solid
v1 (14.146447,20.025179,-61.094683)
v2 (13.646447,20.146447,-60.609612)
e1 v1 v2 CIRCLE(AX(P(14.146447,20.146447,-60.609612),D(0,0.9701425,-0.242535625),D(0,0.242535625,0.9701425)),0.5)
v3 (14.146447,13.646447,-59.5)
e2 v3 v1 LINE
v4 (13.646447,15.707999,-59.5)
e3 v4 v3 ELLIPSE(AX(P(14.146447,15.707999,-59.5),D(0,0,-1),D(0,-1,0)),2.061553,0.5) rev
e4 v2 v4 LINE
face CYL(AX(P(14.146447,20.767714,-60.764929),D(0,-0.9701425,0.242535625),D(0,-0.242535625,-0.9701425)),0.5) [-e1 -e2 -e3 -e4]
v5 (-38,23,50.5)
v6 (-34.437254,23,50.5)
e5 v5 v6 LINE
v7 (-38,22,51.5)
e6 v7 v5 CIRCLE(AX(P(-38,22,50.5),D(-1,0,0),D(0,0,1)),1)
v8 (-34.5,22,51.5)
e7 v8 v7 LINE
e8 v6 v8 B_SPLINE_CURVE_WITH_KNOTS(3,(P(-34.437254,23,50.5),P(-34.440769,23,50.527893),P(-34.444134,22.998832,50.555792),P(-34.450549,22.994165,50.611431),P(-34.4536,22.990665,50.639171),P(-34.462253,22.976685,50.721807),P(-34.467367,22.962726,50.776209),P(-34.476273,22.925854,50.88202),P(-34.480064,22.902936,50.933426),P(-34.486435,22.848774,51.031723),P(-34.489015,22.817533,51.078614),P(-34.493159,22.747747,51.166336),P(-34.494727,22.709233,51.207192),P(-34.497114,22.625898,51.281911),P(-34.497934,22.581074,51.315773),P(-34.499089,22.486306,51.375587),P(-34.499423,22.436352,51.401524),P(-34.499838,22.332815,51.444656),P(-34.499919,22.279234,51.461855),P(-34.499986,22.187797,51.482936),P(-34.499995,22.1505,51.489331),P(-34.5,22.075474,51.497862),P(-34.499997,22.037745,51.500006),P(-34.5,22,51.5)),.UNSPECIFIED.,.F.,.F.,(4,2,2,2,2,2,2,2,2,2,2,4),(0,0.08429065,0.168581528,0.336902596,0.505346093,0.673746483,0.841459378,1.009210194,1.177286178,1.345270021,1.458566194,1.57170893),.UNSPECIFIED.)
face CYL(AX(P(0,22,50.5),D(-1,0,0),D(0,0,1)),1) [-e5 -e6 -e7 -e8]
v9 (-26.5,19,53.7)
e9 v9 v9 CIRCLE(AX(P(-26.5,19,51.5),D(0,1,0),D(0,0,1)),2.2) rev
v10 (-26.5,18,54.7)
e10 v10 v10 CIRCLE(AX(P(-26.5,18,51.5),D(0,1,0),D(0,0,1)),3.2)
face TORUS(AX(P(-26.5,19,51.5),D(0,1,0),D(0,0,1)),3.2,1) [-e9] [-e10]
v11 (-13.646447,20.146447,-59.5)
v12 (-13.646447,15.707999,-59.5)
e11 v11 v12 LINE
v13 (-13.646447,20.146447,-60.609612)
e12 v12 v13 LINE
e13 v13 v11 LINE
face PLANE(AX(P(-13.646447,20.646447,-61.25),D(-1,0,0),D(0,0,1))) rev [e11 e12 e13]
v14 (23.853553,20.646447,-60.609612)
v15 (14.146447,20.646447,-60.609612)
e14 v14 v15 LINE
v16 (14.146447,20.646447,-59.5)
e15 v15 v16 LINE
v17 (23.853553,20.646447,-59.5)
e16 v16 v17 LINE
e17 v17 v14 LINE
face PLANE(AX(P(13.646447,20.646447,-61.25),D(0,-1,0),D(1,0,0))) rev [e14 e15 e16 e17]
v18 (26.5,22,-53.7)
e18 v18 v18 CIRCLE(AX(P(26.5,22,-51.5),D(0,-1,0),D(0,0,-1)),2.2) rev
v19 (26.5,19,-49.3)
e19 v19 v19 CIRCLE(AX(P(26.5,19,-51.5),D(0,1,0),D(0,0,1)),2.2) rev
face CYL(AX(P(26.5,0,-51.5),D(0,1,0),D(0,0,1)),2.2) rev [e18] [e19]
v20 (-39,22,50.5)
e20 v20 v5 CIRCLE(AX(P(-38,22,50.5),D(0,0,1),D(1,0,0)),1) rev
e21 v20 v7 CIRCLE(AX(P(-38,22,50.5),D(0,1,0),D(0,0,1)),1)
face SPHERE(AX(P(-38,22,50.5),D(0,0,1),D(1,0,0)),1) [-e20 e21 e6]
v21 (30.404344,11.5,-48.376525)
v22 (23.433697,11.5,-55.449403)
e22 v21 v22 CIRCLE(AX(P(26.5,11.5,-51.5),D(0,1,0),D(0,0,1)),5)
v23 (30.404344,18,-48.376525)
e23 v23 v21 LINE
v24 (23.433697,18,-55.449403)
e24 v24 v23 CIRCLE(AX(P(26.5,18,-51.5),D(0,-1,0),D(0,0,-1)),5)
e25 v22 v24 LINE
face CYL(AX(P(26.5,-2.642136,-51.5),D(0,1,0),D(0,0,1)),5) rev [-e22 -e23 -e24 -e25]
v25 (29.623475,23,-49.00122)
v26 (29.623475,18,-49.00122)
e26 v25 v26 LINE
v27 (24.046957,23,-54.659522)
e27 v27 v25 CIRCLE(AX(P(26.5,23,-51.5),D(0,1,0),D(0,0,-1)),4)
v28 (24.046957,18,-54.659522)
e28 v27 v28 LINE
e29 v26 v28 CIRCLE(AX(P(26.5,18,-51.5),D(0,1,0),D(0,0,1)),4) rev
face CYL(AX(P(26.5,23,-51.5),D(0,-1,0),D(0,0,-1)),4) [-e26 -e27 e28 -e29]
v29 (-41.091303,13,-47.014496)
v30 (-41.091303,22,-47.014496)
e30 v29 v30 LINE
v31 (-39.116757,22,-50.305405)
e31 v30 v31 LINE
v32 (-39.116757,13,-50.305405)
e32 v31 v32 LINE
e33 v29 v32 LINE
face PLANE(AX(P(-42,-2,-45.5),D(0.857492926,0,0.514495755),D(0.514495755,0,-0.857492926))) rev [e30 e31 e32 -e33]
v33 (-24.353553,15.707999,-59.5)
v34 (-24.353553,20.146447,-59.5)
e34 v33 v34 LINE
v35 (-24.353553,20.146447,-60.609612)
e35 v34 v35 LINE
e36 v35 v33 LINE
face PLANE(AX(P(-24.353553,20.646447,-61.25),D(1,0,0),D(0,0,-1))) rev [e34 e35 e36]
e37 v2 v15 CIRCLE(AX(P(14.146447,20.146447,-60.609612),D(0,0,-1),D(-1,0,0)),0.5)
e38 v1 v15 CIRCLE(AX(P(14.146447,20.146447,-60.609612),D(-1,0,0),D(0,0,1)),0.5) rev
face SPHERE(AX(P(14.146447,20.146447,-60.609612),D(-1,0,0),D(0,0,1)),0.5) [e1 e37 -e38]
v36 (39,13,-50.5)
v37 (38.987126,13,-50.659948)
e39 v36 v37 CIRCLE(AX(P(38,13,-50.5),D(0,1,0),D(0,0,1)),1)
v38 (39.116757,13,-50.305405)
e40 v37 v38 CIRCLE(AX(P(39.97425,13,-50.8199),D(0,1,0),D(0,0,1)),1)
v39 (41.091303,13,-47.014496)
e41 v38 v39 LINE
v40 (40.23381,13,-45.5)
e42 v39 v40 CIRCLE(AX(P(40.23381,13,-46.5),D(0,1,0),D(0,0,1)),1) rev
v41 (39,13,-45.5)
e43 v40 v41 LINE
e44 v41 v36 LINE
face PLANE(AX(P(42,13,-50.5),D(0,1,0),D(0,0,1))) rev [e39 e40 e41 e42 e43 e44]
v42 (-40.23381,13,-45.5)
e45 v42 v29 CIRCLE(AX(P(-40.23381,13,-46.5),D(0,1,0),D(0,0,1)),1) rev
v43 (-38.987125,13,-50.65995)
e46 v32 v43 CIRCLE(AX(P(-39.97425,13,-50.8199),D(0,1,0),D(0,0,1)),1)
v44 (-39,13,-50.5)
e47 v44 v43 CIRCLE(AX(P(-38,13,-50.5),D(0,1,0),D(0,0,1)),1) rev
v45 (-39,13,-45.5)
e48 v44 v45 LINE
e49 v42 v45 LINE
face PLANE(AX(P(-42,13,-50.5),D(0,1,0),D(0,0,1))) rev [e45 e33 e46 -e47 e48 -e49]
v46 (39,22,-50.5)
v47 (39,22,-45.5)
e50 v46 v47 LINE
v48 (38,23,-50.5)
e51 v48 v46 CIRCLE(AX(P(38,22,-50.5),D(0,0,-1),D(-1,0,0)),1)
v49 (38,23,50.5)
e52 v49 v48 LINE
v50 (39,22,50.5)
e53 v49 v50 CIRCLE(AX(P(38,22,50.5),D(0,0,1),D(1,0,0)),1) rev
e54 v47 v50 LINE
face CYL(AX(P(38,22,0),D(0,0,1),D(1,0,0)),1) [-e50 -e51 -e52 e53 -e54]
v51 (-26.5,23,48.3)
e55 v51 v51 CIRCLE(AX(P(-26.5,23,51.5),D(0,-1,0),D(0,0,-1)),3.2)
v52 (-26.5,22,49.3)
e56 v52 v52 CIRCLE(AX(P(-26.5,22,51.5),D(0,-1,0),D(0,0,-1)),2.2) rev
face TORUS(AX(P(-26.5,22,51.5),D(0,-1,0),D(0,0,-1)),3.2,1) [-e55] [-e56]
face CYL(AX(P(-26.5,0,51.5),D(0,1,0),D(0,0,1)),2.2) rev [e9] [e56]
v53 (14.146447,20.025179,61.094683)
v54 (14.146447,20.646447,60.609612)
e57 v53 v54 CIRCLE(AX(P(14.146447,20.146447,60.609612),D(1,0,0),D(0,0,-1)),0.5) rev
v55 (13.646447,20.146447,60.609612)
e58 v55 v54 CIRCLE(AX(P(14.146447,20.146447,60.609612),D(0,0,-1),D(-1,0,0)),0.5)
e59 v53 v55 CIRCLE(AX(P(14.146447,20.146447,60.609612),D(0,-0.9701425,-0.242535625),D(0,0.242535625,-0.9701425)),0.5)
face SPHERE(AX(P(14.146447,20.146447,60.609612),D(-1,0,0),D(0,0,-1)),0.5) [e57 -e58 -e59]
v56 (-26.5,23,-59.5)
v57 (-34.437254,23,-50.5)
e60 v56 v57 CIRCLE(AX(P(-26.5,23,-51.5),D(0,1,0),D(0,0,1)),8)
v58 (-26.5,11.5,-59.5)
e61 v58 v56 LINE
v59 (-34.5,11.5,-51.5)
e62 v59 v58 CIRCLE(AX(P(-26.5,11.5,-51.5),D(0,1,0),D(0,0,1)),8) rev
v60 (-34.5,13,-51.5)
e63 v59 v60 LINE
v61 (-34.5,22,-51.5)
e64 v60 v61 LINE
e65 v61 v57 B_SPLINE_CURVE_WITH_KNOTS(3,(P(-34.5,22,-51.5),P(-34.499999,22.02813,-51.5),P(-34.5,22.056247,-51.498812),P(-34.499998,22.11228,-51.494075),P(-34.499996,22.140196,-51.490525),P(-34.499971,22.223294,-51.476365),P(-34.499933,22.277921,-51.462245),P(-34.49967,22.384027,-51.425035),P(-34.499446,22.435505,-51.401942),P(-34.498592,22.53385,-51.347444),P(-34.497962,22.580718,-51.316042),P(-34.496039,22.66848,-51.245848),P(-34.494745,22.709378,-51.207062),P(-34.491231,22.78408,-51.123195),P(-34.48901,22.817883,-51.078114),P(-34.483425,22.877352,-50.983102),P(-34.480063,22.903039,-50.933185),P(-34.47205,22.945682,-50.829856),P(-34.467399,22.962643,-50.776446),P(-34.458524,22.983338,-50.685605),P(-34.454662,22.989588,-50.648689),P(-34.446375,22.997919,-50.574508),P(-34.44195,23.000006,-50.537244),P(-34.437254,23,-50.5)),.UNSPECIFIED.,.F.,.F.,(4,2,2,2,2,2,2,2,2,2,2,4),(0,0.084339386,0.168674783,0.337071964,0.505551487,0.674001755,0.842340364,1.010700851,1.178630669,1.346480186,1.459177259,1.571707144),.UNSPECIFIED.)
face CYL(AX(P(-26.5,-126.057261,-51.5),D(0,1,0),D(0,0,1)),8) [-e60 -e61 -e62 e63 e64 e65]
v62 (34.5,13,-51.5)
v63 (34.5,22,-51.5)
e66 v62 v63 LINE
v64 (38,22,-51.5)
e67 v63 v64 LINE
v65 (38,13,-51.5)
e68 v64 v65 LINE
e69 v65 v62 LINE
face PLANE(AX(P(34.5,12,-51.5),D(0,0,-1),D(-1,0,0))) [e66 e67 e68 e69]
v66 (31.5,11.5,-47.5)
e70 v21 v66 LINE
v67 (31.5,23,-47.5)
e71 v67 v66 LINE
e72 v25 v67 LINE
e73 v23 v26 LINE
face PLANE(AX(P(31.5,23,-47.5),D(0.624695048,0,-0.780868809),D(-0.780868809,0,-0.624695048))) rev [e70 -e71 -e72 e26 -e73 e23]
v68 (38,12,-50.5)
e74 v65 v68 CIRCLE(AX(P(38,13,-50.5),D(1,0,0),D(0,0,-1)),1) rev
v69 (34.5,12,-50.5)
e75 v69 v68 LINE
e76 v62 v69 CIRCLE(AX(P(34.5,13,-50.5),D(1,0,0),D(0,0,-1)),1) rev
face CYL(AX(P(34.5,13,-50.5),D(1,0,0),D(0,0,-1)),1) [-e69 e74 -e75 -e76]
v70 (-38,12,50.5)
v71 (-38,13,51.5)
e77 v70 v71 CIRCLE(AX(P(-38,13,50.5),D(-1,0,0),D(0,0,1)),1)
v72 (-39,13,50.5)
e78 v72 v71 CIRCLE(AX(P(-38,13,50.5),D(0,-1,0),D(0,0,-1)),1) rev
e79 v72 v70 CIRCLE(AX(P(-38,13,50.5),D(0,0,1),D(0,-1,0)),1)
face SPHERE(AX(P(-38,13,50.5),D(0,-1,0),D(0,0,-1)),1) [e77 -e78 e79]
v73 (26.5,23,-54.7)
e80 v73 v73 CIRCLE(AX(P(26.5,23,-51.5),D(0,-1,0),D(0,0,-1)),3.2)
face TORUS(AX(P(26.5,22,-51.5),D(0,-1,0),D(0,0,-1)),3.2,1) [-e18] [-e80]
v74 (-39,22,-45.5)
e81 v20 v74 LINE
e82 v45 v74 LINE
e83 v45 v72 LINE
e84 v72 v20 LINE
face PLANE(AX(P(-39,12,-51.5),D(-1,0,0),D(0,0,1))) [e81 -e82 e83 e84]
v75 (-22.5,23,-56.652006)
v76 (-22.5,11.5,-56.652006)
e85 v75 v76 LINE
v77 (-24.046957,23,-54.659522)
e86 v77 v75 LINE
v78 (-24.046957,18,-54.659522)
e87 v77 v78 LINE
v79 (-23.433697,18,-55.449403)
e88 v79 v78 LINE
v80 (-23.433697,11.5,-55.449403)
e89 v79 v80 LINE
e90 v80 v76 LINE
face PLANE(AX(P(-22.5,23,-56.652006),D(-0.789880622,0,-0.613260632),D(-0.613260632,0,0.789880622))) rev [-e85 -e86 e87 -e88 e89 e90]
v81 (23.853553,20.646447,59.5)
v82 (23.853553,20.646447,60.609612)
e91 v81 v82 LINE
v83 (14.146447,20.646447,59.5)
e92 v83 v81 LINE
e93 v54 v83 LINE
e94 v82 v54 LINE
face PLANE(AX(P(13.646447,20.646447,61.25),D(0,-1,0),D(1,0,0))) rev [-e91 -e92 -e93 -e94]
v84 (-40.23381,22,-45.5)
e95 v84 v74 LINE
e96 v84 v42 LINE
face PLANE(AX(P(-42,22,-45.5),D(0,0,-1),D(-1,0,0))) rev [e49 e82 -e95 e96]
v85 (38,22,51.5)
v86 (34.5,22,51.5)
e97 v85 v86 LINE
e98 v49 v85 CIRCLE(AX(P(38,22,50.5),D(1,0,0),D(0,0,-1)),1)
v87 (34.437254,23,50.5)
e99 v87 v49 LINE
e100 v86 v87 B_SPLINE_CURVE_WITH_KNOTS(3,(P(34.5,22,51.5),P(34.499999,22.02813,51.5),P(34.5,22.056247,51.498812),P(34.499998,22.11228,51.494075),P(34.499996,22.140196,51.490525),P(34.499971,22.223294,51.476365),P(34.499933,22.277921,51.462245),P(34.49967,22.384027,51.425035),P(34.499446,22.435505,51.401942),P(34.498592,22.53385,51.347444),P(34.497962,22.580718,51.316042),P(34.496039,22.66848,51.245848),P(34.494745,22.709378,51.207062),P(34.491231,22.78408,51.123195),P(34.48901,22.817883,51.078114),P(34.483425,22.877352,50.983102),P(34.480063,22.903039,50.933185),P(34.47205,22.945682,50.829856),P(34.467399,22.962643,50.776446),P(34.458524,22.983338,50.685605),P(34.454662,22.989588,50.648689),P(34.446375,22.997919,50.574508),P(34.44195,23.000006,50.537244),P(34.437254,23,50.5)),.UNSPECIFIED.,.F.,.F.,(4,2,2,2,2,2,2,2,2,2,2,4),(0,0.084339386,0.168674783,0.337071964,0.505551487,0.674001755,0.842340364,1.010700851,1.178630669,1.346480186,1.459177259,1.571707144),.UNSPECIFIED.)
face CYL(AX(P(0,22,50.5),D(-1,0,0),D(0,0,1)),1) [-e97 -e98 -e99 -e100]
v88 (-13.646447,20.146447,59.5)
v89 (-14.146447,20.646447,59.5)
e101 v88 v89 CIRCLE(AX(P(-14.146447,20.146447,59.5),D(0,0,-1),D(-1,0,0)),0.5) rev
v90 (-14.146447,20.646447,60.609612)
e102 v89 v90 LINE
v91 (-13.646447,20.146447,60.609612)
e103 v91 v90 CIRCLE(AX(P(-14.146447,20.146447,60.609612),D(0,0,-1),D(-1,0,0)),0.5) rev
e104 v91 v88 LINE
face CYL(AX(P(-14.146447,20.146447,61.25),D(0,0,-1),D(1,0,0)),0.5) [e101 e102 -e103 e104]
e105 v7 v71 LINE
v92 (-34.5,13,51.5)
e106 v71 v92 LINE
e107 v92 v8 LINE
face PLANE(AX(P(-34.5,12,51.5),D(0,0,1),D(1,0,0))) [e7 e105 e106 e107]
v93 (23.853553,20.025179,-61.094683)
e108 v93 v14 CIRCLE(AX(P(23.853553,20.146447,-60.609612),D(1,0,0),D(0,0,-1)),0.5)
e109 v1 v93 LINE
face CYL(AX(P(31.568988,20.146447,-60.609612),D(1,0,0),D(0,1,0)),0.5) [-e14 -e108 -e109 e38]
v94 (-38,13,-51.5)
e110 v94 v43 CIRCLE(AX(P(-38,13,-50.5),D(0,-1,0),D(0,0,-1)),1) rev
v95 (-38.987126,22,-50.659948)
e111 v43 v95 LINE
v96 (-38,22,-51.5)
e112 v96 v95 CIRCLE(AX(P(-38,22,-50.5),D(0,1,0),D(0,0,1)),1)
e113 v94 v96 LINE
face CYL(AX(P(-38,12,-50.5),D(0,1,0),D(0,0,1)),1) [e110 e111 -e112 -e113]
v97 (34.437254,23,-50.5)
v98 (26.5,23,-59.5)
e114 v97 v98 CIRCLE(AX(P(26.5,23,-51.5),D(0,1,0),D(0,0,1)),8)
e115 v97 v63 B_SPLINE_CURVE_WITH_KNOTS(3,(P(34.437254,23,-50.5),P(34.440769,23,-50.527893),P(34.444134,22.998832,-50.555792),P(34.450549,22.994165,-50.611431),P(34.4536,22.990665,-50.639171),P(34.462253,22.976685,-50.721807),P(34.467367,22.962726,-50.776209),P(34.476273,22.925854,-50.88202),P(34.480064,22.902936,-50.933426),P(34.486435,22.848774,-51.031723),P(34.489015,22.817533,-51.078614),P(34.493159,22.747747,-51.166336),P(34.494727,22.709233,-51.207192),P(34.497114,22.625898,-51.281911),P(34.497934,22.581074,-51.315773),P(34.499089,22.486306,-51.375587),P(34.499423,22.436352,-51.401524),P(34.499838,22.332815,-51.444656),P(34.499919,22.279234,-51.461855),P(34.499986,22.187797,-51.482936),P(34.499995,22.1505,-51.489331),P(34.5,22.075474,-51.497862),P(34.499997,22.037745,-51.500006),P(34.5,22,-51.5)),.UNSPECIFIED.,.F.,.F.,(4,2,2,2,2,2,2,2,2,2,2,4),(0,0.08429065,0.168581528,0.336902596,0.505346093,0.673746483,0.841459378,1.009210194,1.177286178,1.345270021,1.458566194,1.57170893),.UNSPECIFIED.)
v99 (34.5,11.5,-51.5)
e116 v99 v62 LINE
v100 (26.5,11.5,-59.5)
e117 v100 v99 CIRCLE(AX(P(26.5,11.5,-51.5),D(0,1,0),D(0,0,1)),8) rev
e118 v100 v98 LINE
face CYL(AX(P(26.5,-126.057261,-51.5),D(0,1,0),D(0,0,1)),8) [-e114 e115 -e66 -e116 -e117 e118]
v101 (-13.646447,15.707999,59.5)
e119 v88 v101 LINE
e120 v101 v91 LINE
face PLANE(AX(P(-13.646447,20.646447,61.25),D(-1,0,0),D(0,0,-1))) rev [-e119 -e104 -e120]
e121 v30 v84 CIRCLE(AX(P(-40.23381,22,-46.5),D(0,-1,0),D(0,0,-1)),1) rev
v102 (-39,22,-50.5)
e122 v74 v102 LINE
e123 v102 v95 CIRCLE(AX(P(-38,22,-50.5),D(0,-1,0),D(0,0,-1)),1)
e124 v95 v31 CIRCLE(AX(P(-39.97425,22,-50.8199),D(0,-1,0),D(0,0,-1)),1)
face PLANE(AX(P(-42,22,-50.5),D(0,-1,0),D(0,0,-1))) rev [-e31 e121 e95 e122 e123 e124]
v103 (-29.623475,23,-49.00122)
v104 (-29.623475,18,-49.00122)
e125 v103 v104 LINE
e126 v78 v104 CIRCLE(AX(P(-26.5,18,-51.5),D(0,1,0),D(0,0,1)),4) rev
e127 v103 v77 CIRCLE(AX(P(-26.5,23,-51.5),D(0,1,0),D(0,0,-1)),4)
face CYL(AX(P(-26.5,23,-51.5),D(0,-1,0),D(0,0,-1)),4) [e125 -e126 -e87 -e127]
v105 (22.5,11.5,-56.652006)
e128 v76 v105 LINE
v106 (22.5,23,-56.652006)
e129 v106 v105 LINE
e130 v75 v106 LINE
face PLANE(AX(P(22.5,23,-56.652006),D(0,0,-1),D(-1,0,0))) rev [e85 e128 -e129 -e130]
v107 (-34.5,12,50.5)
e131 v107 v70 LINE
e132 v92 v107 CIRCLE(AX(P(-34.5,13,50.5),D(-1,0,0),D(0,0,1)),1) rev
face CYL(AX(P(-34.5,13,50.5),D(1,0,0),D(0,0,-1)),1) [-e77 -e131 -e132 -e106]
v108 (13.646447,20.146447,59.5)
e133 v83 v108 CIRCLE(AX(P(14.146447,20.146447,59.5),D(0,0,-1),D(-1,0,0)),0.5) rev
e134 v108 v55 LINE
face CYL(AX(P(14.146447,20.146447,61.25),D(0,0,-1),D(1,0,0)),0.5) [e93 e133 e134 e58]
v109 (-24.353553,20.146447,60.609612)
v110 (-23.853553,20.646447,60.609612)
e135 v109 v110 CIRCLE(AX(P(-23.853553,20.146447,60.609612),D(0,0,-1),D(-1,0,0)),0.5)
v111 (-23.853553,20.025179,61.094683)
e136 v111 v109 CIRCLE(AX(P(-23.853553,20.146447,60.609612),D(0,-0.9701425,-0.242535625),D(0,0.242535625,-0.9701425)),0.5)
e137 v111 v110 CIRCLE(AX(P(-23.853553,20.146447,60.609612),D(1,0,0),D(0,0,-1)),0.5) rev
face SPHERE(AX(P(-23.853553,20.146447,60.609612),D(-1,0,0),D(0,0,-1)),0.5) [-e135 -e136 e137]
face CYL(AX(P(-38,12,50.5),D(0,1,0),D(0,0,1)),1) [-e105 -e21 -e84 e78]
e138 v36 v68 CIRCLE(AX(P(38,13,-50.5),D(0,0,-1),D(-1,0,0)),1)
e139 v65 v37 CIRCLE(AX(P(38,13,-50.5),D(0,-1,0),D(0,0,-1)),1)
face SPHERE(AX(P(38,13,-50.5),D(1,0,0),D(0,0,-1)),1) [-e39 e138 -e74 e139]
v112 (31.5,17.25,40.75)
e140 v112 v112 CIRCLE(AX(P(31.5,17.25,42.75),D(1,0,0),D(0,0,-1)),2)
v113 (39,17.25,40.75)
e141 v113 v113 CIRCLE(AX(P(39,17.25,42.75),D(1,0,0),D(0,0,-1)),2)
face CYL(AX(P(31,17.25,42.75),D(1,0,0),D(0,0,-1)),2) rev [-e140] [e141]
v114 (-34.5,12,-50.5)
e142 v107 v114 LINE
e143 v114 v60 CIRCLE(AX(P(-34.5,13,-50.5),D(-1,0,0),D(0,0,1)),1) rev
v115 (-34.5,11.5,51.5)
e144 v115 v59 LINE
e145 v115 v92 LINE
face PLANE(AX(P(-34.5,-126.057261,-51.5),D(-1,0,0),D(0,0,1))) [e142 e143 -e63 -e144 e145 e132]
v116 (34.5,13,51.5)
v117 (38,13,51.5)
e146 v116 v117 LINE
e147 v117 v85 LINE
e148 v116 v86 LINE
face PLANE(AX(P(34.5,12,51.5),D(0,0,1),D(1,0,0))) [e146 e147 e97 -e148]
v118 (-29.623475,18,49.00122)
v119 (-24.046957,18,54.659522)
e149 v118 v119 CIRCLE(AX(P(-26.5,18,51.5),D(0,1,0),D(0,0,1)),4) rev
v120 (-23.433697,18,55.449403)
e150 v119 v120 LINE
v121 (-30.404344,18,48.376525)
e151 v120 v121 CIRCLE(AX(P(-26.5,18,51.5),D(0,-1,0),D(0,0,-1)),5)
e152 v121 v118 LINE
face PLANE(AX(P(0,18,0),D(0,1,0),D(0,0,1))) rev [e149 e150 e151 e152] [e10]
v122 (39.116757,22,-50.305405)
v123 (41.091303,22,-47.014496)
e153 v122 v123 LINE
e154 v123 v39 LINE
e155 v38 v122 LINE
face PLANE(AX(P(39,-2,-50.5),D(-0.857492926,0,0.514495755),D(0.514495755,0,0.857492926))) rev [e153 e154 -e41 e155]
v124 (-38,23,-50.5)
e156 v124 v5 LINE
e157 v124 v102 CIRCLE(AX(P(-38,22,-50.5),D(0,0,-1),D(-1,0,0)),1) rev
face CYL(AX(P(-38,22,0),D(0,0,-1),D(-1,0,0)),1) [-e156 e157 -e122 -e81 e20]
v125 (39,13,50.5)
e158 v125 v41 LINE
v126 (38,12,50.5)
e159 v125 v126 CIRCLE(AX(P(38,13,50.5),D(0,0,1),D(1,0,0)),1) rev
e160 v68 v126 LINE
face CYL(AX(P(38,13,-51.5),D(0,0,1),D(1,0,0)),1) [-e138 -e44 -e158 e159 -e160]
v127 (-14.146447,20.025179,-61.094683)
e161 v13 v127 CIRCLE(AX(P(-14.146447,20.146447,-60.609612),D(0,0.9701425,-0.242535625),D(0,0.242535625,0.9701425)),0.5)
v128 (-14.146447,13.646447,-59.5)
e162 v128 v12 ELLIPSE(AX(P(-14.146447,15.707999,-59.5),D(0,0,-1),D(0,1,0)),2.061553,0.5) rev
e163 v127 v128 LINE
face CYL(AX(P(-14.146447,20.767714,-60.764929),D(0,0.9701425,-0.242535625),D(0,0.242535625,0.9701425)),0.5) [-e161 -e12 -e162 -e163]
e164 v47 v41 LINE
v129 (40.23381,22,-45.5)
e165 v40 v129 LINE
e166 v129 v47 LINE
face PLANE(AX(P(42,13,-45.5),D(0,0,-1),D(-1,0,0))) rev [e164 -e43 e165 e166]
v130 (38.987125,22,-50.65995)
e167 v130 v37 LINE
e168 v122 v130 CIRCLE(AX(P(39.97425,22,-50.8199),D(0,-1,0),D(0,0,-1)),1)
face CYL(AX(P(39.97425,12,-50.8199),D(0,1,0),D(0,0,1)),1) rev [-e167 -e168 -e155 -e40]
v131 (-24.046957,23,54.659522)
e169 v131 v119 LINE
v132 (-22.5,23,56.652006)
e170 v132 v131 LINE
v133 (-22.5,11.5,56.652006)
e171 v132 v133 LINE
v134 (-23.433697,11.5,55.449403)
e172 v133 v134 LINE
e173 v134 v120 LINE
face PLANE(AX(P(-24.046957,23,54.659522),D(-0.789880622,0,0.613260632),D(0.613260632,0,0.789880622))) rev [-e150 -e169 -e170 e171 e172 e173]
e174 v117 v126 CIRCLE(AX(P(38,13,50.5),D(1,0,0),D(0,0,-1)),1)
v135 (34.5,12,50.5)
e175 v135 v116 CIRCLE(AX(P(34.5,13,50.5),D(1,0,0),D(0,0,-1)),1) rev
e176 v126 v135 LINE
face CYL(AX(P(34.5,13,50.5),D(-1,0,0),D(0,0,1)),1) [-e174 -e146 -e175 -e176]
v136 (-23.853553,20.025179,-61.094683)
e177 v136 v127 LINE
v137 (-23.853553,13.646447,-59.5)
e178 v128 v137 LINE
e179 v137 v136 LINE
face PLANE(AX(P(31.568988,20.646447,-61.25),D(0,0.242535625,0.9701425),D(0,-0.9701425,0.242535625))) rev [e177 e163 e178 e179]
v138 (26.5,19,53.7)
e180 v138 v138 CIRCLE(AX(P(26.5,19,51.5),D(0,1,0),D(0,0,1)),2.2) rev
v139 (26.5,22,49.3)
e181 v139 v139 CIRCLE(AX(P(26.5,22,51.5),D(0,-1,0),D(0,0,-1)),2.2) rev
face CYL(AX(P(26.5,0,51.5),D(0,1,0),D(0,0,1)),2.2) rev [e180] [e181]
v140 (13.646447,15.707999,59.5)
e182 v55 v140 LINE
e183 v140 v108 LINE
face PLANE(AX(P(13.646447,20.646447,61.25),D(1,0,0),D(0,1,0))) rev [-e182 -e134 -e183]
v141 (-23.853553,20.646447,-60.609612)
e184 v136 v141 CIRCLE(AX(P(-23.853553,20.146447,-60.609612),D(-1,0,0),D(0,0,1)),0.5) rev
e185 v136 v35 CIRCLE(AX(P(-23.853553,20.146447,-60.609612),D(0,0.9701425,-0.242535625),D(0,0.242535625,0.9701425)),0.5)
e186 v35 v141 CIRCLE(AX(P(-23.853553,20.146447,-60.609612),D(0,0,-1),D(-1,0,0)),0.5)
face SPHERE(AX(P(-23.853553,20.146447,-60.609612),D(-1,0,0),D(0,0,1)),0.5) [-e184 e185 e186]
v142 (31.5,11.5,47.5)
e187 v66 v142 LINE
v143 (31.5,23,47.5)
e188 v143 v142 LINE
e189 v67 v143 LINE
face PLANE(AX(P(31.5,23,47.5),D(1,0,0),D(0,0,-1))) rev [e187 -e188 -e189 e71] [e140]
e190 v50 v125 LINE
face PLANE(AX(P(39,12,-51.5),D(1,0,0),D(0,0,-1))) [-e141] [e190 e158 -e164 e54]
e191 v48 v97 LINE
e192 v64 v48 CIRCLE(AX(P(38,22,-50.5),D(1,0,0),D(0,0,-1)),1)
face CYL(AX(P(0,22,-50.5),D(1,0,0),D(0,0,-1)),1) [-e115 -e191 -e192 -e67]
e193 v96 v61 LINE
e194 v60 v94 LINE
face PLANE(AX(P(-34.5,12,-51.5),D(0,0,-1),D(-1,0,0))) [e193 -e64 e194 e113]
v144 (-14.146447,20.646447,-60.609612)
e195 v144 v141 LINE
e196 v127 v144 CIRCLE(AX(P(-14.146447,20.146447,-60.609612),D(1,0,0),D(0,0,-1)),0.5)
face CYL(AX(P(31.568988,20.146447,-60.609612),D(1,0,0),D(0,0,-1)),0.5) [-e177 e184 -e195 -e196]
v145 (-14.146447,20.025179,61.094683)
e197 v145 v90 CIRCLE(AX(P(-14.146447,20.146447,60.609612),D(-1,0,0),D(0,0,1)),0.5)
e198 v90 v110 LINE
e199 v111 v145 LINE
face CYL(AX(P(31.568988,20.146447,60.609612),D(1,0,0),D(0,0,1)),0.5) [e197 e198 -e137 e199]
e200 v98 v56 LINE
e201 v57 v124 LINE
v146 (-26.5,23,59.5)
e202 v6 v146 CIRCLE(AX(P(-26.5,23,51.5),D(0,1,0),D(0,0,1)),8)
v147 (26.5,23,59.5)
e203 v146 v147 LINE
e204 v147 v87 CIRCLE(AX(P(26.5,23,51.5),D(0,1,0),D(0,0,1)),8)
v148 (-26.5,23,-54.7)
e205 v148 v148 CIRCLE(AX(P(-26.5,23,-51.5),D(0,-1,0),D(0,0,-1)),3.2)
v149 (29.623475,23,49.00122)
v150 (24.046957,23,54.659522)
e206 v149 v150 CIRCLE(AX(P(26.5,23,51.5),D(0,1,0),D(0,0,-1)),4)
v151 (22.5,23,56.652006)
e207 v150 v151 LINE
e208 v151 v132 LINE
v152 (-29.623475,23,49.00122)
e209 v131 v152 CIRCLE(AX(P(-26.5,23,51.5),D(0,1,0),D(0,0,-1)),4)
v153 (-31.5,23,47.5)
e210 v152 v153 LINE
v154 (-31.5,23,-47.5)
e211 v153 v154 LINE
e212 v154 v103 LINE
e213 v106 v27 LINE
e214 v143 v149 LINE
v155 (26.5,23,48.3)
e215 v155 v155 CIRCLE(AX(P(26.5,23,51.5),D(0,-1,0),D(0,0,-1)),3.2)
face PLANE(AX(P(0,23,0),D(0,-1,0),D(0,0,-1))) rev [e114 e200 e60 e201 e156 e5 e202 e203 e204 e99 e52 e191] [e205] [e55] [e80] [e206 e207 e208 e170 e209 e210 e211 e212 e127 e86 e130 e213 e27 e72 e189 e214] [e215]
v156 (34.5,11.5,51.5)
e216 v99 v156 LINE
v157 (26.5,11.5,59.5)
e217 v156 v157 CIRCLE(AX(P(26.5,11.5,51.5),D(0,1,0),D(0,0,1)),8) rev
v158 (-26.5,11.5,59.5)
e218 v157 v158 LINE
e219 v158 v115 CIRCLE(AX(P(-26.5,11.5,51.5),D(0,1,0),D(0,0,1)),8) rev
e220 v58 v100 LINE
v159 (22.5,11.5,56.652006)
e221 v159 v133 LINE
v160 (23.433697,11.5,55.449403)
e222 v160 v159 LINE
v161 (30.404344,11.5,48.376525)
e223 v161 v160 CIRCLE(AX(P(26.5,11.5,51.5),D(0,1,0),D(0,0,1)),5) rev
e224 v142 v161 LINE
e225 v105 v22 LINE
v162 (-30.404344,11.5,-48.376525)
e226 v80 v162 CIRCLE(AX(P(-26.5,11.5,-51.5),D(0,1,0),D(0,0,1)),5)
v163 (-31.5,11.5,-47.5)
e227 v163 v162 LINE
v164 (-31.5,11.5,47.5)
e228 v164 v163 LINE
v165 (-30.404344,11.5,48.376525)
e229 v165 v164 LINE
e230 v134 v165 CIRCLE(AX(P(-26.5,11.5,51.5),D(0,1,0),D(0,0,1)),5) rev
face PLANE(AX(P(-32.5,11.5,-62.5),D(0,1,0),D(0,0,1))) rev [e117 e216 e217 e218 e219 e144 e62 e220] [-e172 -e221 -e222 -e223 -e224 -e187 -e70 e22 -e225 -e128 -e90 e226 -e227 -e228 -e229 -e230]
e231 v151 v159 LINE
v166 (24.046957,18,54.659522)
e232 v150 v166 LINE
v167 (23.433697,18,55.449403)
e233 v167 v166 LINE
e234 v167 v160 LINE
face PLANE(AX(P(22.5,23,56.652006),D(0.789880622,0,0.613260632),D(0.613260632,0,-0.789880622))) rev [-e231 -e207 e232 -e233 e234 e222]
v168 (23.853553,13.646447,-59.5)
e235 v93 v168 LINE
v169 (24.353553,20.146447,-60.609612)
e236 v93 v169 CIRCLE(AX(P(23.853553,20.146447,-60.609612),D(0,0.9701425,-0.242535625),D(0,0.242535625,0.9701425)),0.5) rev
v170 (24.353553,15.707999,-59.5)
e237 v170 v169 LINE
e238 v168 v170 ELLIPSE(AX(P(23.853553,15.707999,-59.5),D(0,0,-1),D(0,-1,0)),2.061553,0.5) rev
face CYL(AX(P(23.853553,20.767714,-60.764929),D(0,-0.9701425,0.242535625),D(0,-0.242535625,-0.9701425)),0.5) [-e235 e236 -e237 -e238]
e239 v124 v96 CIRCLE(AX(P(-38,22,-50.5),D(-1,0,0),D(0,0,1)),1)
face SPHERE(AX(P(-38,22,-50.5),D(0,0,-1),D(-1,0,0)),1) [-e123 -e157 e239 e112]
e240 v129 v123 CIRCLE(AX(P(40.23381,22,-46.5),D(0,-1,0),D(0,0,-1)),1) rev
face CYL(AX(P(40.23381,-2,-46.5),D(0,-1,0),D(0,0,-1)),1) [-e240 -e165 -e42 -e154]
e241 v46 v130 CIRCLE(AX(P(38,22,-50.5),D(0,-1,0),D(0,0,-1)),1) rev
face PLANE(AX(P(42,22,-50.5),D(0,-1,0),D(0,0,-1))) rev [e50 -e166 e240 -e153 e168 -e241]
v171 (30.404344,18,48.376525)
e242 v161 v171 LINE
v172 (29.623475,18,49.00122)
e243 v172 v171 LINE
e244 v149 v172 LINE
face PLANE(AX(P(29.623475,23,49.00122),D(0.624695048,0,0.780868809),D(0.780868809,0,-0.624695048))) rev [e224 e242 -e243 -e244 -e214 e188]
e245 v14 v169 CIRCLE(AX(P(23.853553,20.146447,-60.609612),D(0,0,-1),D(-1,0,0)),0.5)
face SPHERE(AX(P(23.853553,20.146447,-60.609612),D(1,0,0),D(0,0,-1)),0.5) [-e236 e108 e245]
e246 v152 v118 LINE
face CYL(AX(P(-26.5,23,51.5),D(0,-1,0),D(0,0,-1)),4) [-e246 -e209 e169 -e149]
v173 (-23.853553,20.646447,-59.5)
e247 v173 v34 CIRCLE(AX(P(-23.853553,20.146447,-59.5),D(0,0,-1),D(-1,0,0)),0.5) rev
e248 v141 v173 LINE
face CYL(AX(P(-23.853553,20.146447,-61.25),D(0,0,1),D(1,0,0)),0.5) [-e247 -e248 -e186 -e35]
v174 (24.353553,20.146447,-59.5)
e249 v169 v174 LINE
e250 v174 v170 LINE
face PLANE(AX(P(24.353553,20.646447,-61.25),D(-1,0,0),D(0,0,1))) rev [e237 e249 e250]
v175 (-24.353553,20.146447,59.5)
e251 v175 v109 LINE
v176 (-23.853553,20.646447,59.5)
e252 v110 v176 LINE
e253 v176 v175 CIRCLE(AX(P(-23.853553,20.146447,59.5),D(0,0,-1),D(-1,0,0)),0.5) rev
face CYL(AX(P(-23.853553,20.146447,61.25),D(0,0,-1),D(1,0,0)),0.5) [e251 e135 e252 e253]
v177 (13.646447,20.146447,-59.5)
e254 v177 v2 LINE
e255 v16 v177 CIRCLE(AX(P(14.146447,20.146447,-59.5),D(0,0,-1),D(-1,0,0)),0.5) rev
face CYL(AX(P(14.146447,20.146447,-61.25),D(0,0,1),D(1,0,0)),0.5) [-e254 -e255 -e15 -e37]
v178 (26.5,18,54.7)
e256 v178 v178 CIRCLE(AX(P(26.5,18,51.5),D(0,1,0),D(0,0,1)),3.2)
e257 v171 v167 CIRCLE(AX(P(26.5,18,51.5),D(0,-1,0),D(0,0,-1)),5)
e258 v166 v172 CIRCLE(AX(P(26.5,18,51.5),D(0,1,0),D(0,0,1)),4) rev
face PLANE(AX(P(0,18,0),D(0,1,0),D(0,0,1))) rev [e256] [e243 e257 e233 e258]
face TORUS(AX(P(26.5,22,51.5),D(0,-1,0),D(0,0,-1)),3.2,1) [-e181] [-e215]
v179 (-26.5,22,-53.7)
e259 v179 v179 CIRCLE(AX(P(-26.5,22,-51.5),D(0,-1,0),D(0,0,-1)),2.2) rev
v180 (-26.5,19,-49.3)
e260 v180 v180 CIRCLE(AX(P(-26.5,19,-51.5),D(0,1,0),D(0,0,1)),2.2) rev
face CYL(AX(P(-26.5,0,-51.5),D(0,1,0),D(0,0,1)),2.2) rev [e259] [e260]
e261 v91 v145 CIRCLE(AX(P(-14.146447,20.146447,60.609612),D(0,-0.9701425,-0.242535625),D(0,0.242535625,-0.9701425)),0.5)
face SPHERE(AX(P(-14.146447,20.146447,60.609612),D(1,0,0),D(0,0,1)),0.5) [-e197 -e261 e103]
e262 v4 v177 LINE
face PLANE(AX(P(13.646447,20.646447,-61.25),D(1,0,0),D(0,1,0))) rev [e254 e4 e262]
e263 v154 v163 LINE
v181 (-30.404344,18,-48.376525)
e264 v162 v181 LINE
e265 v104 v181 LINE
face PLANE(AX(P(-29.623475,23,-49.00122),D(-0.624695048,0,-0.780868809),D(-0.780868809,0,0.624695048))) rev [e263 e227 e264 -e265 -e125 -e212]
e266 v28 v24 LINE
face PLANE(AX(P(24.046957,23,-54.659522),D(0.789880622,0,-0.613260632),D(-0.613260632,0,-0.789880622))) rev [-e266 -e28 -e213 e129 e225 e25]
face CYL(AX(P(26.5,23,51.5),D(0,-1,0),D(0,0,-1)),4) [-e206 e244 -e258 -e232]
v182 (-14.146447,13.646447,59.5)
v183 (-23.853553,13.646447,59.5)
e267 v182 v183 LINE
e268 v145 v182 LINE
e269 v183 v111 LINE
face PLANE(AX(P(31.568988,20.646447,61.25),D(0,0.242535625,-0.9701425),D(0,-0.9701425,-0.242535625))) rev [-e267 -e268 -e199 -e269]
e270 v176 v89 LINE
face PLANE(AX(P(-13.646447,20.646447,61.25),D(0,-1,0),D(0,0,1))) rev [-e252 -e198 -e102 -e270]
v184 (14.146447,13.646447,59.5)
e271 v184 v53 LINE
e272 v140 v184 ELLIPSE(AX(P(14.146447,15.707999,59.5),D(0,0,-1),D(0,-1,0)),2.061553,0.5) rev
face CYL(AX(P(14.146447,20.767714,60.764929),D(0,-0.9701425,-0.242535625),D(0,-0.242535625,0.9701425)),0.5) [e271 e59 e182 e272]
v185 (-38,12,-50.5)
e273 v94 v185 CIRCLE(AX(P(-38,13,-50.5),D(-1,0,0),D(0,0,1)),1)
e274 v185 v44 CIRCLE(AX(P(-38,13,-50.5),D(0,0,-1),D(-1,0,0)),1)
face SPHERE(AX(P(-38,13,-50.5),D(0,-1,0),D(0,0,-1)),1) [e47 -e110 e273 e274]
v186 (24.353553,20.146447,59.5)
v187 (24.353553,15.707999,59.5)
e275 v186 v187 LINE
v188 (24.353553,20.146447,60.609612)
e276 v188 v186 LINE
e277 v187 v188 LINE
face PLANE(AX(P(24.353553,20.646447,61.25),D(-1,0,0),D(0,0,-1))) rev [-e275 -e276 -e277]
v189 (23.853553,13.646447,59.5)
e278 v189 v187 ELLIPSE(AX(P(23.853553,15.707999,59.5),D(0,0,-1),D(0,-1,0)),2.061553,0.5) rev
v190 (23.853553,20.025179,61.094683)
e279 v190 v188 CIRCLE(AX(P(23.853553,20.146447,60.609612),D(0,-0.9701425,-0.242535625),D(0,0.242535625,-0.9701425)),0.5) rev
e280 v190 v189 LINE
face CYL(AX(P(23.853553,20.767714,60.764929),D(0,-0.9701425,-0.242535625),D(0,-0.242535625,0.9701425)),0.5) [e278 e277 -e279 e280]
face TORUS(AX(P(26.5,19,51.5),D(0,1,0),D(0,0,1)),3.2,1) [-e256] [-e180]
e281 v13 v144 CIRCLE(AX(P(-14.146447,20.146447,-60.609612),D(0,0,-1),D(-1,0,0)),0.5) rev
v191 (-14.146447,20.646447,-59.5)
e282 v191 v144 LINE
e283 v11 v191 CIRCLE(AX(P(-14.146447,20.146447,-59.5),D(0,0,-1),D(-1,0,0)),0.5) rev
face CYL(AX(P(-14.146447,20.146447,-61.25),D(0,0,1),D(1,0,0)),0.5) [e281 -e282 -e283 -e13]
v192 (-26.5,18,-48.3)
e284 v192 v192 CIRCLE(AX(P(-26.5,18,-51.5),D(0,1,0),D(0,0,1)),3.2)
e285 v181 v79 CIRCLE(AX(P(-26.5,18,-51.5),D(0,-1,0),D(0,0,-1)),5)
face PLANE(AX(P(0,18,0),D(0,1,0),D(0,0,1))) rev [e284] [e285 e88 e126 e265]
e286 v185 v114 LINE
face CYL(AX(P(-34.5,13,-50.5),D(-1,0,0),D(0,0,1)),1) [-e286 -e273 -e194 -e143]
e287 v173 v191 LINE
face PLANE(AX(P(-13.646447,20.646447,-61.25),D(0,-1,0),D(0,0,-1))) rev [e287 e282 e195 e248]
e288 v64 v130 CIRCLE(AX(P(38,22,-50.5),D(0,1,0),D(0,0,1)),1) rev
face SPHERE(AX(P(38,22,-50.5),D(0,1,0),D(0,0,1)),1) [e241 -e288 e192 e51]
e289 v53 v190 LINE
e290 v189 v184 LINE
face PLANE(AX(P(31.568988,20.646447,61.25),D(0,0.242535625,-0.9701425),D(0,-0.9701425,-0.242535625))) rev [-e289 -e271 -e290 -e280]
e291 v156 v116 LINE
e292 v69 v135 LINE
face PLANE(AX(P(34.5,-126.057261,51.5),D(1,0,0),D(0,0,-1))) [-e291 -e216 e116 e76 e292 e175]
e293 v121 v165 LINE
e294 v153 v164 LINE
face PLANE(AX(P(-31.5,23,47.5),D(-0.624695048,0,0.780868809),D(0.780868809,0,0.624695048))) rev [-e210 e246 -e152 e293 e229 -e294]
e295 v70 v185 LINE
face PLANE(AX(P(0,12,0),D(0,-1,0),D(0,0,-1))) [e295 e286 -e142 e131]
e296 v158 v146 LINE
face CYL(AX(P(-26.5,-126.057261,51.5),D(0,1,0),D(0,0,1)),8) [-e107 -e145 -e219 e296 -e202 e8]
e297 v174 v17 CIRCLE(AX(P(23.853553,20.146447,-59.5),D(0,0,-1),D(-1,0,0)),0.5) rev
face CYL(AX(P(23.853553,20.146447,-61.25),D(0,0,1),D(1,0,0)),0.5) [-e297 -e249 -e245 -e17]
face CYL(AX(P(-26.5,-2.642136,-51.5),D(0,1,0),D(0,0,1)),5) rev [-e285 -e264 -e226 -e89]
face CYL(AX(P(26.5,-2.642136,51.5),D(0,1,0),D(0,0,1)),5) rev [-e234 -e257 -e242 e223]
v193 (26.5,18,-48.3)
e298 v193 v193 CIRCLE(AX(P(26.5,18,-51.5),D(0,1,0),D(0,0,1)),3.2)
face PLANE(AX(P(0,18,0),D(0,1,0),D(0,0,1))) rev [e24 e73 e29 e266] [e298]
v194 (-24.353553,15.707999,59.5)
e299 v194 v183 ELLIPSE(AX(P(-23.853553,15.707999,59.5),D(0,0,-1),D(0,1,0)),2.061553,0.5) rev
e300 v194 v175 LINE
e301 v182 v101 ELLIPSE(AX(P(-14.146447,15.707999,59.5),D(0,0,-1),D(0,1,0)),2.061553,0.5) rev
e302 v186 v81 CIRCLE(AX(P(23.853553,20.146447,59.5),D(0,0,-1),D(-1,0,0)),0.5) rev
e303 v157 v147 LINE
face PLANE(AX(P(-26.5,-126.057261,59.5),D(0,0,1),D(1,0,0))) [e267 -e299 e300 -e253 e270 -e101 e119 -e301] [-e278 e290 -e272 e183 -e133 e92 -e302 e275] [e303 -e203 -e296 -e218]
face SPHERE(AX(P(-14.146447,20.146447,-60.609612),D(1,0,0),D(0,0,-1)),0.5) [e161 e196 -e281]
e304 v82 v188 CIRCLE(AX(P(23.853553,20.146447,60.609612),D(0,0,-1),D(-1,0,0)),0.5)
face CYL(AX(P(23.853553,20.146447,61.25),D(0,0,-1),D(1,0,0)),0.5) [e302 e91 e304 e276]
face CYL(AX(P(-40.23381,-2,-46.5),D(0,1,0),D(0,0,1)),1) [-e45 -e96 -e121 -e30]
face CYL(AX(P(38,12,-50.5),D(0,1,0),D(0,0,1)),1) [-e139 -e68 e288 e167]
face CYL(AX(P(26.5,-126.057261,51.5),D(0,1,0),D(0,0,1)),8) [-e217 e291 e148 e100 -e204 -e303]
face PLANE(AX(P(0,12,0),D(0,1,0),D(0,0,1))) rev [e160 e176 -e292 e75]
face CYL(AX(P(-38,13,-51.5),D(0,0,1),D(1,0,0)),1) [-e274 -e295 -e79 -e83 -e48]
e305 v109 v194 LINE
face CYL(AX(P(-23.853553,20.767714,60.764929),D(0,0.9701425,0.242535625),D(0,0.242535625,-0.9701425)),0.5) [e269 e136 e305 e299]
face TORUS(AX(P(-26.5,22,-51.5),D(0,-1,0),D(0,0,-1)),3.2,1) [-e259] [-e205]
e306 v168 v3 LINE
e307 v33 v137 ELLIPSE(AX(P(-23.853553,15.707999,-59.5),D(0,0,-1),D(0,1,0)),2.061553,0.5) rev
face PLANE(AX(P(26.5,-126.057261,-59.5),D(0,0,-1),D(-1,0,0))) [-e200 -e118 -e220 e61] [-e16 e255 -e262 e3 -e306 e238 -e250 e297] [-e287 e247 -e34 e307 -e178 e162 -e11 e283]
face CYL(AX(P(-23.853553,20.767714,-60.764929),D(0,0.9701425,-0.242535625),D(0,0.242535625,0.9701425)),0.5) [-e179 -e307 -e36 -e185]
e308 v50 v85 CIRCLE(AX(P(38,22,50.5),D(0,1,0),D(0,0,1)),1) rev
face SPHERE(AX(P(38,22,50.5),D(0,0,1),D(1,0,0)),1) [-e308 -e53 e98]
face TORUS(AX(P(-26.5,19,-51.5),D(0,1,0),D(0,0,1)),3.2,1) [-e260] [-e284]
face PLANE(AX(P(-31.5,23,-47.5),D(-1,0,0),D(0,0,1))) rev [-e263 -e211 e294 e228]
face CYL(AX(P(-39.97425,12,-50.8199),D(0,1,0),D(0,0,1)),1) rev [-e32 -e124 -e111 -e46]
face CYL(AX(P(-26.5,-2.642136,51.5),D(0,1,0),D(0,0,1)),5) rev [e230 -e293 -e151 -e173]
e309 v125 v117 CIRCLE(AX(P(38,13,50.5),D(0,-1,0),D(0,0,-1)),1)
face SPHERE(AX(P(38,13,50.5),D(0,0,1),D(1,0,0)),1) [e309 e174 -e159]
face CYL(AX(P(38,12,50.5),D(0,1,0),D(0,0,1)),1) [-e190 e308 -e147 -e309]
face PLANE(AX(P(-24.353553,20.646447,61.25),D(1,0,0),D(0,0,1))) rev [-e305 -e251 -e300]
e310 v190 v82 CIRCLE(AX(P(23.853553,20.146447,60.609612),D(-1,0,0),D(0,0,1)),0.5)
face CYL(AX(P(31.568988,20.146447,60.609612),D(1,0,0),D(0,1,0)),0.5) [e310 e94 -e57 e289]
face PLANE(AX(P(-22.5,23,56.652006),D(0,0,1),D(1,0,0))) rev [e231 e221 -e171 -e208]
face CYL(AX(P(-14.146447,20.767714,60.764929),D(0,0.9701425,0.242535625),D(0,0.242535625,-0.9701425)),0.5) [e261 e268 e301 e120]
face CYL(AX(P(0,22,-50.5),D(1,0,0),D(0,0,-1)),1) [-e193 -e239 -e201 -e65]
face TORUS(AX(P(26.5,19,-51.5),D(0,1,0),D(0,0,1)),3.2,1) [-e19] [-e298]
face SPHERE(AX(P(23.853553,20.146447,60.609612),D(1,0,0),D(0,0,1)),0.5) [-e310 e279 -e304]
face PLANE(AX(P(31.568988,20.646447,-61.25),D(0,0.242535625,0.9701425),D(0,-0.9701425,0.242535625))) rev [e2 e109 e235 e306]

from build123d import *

# Parameters (mm, degrees)
SKETCH1_W            = 65
SKETCH1_H            = 115
SKETCH1_W_2          = 55
SKETCH1_H_2          = 105
BOSS_EXTRUDE1_DEPTH  = 23
FILLET1_R            = 6
SKETCH2_R            = 6
BOSS_EXTRUDE2_DEPTH  = 23
SKETCH4_R            = 2.2
CUT_EXTRUDE1_DEPTH   = 23
SKETCH7_W            = 55
SKETCH7_H            = 105
CUT_EXTRUDE2_DEPTH   = 13
SKETCH8_W            = 65
SKETCH8_H            = 11.5
CUT_EXTRUDE3_DEPTH   = 120
SKETCH9_R            = 5
CUT_EXTRUDE4_DEPTH   = 6.5
BOSS_EXTRUDE3_DEPTH  = 11.5
SKETCH13_W           = 10.707106782
SKETCH13_H           = 7
BOSS_EXTRUDE5_DEPTH  = 1.75
CUT_EXTRUDE5_REACH   = 90.002
FILLET3_R            = 0.5
FILLET3_OF_MIRROR4_R = 0.5
FILLET5_R            = 1
CUT_EXTRUDE7_DEPTH   = 72.111775792
SKETCH18_W           = 4.5
SKETCH18_H           = 103
BOSS_EXTRUDE6_DEPTH  = 11
FILLET6_R            = 1
SKETCH20_W           = 5
SKETCH20_H           = 9
BOSS_EXTRUDE7_DEPTH  = 3
SKETCH21_W           = 5
SKETCH21_H           = 9
BOSS_EXTRUDE8_DEPTH  = 3
CUT_EXTRUDE8_DEPTH   = 24
FILLET7_R            = 1
SKETCH23_R           = 2
CUT_EXTRUDE9_DEPTH   = 8


# Some blends are built 0.0001 mm under size
with BuildPart() as part:
    # Sketch1 → Boss-Extrude1 (new body)
    with BuildSketch(Plane(origin=(0, 0, 0), x_dir=(1, 0, 0), z_dir=(0, 1, 0))):
        Rectangle(SKETCH1_W, SKETCH1_H)
        Rectangle(SKETCH1_W_2, SKETCH1_H_2, mode=Mode.SUBTRACT)
    extrude(amount=BOSS_EXTRUDE1_DEPTH)

    # Fillet1
    fillet1_edges = [part.edges().sort_by_distance(p)[0] for p in [
        (32.5, 11.5, 57.5),
        (-32.5, 11.5, 57.5),
        (-32.5, 11.5, -57.5),
        (32.5, 11.5, -57.5),
    ]]
    fillet(fillet1_edges, radius=FILLET1_R)

    # Sketch2 → Boss-Extrude2 (add)
    with BuildSketch(Plane(origin=(0, 23, 0), x_dir=(1, 0, 0), z_dir=(0, 1, 0))):
        with Locations((-26.5, 51.5)):
            Circle(SKETCH2_R)
        with Locations((26.5, 51.5)):
            Circle(SKETCH2_R)
        with Locations((-26.5, -51.5)):
            Circle(SKETCH2_R)
        with Locations((26.5, -51.5)):
            Circle(SKETCH2_R)
    extrude(amount=-BOSS_EXTRUDE2_DEPTH)

    # Sketch4 → Cut-Extrude1 (cut)
    with BuildSketch(Plane(origin=(0, 23, 0), x_dir=(1, 0, 0), z_dir=(0, 1, 0))):
        with Locations(Location((-26.5, 51.5, 0), (0, 0, 270))):
            Circle(SKETCH4_R)
        with Locations(Location((26.5, 51.5, 0), (0, 0, 270))):
            Circle(SKETCH4_R)
        with Locations(Location((26.5, -51.5, 0), (0, 0, 270))):
            Circle(SKETCH4_R)
        with Locations(Location((-26.5, -51.5, 0), (0, 0, 270))):
            Circle(SKETCH4_R)
    extrude(amount=-CUT_EXTRUDE1_DEPTH, mode=Mode.SUBTRACT)

    # Sketch7 → Cut-Extrude2 (cut)
    with BuildSketch(Plane(origin=(0, 18, 0), x_dir=(1, 0, 0), z_dir=(0, 1, 0))):
        Rectangle(SKETCH7_W, SKETCH7_H)
    extrude(amount=-CUT_EXTRUDE2_DEPTH, mode=Mode.SUBTRACT)

    # Sketch8 → Cut-Extrude3 (cut)
    with BuildSketch(Plane.XY.offset(57.5)):
        with Locations((0, 5.75)):
            Rectangle(SKETCH8_W, SKETCH8_H)
    extrude(amount=-CUT_EXTRUDE3_DEPTH, mode=Mode.SUBTRACT)

    # Sketch9 → Cut-Extrude4 (cut)
    with BuildSketch(Plane.XZ.offset(-18)):
        with Locations((-26.5, -51.5)):
            Circle(SKETCH9_R)
        with Locations((26.5, -51.5)):
            Circle(SKETCH9_R)
        with Locations((26.5, 51.5)):
            Circle(SKETCH9_R)
        with Locations((-26.5, 51.5)):
            Circle(SKETCH9_R)
    extrude(amount=CUT_EXTRUDE4_DEPTH, mode=Mode.SUBTRACT)

    # Sketch10 → Boss-Extrude3 (add)
    with BuildSketch(Plane(origin=(0, 23, 0), x_dir=(1, 0, 0), z_dir=(0, 1, 0))):
        with BuildLine():
            Line((-26.5, -59.5), (26.5, -59.5))
            ThreePointArc((26.5, -59.5), (32.156854249, -57.156854249), (34.5, -51.5))
            Line((34.5, -51.5), (34.5, 51.5))
            ThreePointArc((34.5, 51.5), (32.156854249, 57.156854249), (26.5, 59.5))
            Line((26.5, 59.5), (-26.5, 59.5))
            ThreePointArc((-26.5, 59.5), (-32.156854249, 57.156854249), (-34.5, 51.5))
            Line((-34.5, 51.5), (-34.5, -51.5))
            ThreePointArc((-34.5, -51.5), (-32.156854249, -57.156854249), (-26.5, -59.5))
        make_face()
        with BuildLine():
            Line((-26.5, -57.5), (26.5, -57.5))
            ThreePointArc((26.5, -57.5), (30.742640687, -55.742640687), (32.5, -51.5))
            Line((32.5, -51.5), (32.5, 51.5))
            ThreePointArc((32.5, 51.5), (30.742640687, 55.742640687), (26.5, 57.5))
            Line((26.5, 57.5), (-26.5, 57.5))
            ThreePointArc((-26.5, 57.5), (-30.742640687, 55.742640687), (-32.5, 51.5))
            Line((-32.5, 51.5), (-32.5, -51.5))
            ThreePointArc((-32.5, -51.5), (-30.742640687, -55.742640687), (-26.5, -57.5))
        make_face(mode=Mode.SUBTRACT)
    extrude(amount=-BOSS_EXTRUDE3_DEPTH)

    # Sketch13 → Boss-Extrude5 (add)
    with BuildSketch(Plane(origin=(0, 0, -59.5), x_dir=(-1, 0, 0), z_dir=(0, 0, -1))):
        with Locations((19, 17.146446609)):
            Rectangle(SKETCH13_W, SKETCH13_H)
        with Locations((-19, 17.146446609)):
            Rectangle(SKETCH13_W, SKETCH13_H)
    boss_extrude5 = extrude(amount=BOSS_EXTRUDE5_DEPTH)

    # Cut-Extrude5: up to this face of the body (flat: up to its plane)
    cut_extrude5_end = Plane(part.part.faces().sort_by_distance((24.353553391, 17.146446609, -60.375))[0])
    # Sketch14 → Cut-Extrude5 (cut, up to the picked face)
    with BuildSketch(Plane.ZY.offset(24.353553391), mode=Mode.PRIVATE) as cut_extrude5_sk1:
        Polygon((-59.5, 13.646446609), (-61.25, 13.646446609), (-61.25, 20.646446609), align=None)
    cut_extrude5_tool1 = split(extrude(cut_extrude5_sk1.sketch, amount=-CUT_EXTRUDE5_REACH, mode=Mode.PRIVATE), bisect_by=cut_extrude5_end, keep=Keep.BOTH, mode=Mode.PRIVATE)
    cut_extrude5 = cut_extrude5_tool1.solids().sort_by(Axis((-24.353553, 15.97978, -60.666667), (1, 0, 0)))[0]
    add(cut_extrude5, mode=Mode.SUBTRACT)

    # Fillet3
    fillet3_edges = [part.edges().sort_by_distance(p)[0] for p in [
        (-24.353553391, 20.646446609, -60.375),
        (-13.646446609, 20.646446609, -60.375),
        (-19, 20.646446609, -61.25),
        (13.646446609, 20.646446609, -60.375),
        (24.353553391, 20.646446609, -60.375),
        (19, 20.646446609, -61.25),
        (13.646446609, 17.146446609, -60.375),
        (-13.646446609, 17.146446609, -60.375),
        (-24.353553391, 17.146446609, -60.375),
        (24.353553391, 17.146446609, -60.375),
    ]]
    fillet(fillet3_edges, radius=FILLET3_R)

    # Mirror4: Boss-Extrude5, Cut-Extrude5 across plane
    add(boss_extrude5.mirror(Plane.XY))
    add(cut_extrude5.mirror(Plane.XY), mode=Mode.SUBTRACT)

    # Fillet3 of Mirror4
    fillet3_of_mirror4_edges = [part.edges().sort_by_distance(p)[0] for p in [
        (-24.353553391, 20.646446609, 60.375),
        (-13.646446609, 20.646446609, 60.375),
        (-19, 20.646446609, 61.25),
        (13.646446609, 20.646446609, 60.375),
        (24.353553391, 20.646446609, 60.375),
        (19, 20.646446609, 61.25),
        (13.646446609, 17.146446609, 60.375),
        (-13.646446609, 17.146446609, 60.375),
        (-24.353553391, 17.146446609, 60.375),
        (24.353553391, 17.146446609, 60.375),
    ]]
    fillet(fillet3_of_mirror4_edges, radius=FILLET3_OF_MIRROR4_R)

    # Fillet5
    fillet5_edges = [part.edges().sort_by_distance(p)[0] for p in [
        (-26.5, 23, 49.3),
        (26.5, 23, 49.3),
        (26.5, 23, -53.7),
        (-26.5, 23, -53.7),
        (-26.5, 18, 49.3),
        (27.5, 20.5, -45.583920217),
        (-20.583920217, 20.5, -52.5),
        (-27.5, 20.5, 45.583920217),
        (20.583920217, 20.5, 52.5),
        (22.257359313, 18, 47.257359313),
        (22.257359313, 18, -47.257359313),
        (-22.257359313, 18, -47.257359313),
        (-22.257359313, 18, 47.257359313),
        (21.092470366, 18, 52.5),
        (26.5, 18, 49.3),
        (-27.5, 18, 46.092470366),
        (-21.092470366, 18, -52.5),
        (-26.5, 18, -53.7),
        (27.5, 18, -46.092470366),
        (26.5, 18, -53.7),
        (-27.5, 18, -46.092470366),
        (21.092470366, 18, -52.5),
        (27.5, 18, 46.092470366),
        (-21.092470366, 18, 52.5),
        (-20.583920217, 20.5, 52.5),
        (-27.5, 20.5, -45.583920217),
        (20.583920217, 20.5, -52.5),
        (27.5, 20.5, 45.583920217),
    ]]
    fillet(fillet5_edges, radius=FILLET5_R - 0.0001)  # a hair under: the kernel refuses the full size

    # Sketch16 → Cut-Extrude7 (cut, through all)
    with BuildSketch(Plane.XZ.offset(-11.5)):
        with BuildLine():
            Line((22.5, -56.652006057), (-22.5, -56.652006057))
            Line((-22.5, -56.652006057), (-24.046957473, -54.659522489))
            ThreePointArc((-24.046957473, -54.659522489), (-23.651058564, -48.692237066), (-29.623475238, -49.00121981))
            Line((-29.623475238, -49.00121981), (-31.5, -47.5))
            Line((-31.5, -47.5), (-31.5, 47.5))
            Line((-31.5, 47.5), (-29.623475238, 49.00121981))
            ThreePointArc((-29.623475238, 49.00121981), (-23.651058564, 48.692237066), (-24.046957473, 54.659522489))
            Line((-24.046957473, 54.659522489), (-22.5, 56.652006057))
            Line((-22.5, 56.652006057), (22.5, 56.652006057))
            Line((22.5, 56.652006057), (24.046957473, 54.659522489))
            ThreePointArc((24.046957473, 54.659522489), (23.651058564, 48.692237066), (29.623475238, 49.00121981))
            Line((29.623475238, 49.00121981), (31.5, 47.5))
            Line((31.5, 47.5), (31.5, -47.5))
            Line((31.5, -47.5), (29.623475238, -49.00121981))
            ThreePointArc((29.623475238, -49.00121981), (23.651058564, -48.692237066), (24.046957473, -54.659522489))
            Line((24.046957473, -54.659522489), (22.5, -56.652006057))
        make_face()
    extrude(amount=-CUT_EXTRUDE7_DEPTH, mode=Mode.SUBTRACT)

    # Sketch18 → Boss-Extrude6 (add)
    with BuildSketch(Plane(origin=(0, 23, 0), x_dir=(1, 0, 0), z_dir=(0, 1, 0))):
        with Locations((-36.75, 0)):
            Rectangle(SKETCH18_W, SKETCH18_H)
        with Locations((36.75, 0)):
            Rectangle(SKETCH18_W, SKETCH18_H)
    extrude(amount=-BOSS_EXTRUDE6_DEPTH)

    # Fillet6
    fillet6_edges = [part.edges().sort_by_distance(p)[0] for p in [
        (-36.75, 12, 51.5),
        (-39, 12, 0),
        (-39, 17.5, 51.5),
        (-36.75, 12, -51.5),
        (-39, 17.5, -51.5),
        (-36.75, 23, -51.5),
        (-39, 23, 0),
        (-36.75, 23, 51.5),
        (36.75, 12, -51.5),
        (39, 12, 0),
        (39, 17.5, -51.5),
        (36.75, 12, 51.5),
        (39, 17.5, 51.5),
        (36.75, 23, 51.5),
        (39, 23, 0),
        (36.75, 23, -51.5),
    ]]
    fillet(fillet6_edges, radius=FILLET6_R)

    # Sketch20 → Boss-Extrude7 (add)
    with BuildSketch(Plane(origin=(39, 0, 0), x_dir=(0, 0, -1), z_dir=(1, 0, 0))):
        with Locations((48, 17.5)):
            Rectangle(SKETCH20_W, SKETCH20_H)
    extrude(amount=BOSS_EXTRUDE7_DEPTH)

    # Sketch21 → Boss-Extrude8 (add)
    with BuildSketch(Plane.ZY.offset(39)):
        with Locations((-48, 17.5)):
            Rectangle(SKETCH21_W, SKETCH21_H)
    extrude(amount=BOSS_EXTRUDE8_DEPTH)

    # Sketch22 → Cut-Extrude8 (cut)
    with BuildSketch(Plane(origin=(0, 22, 0), x_dir=(1, 0, 0), z_dir=(0, 1, 0))):
        Polygon((42, 45.5), (42, 50.5), (39, 50.5), align=None)
        Polygon((-39, 50.5), (-42, 50.5), (-42, 45.5), align=None)
    extrude(amount=-CUT_EXTRUDE8_DEPTH, mode=Mode.SUBTRACT)

    # Fillet7
    # the kernel refuses this fillet: 1 mm, written as the material it adds along each edge
    with BuildSketch(Plane(origin=(-39, 22, -50.5), x_dir=(0.08023374976130676, 0, -0.9967760758561774), z_dir=(0, -1, 0))) as fillet7_piece_1:
        with BuildLine():
            CenterArc((0.240701249, -0.996776076), FILLET7_R, 94.602001801, 21.75975293)
            Line((-0.203335938, -0.100767719), (0, 0))
            ThreePointArc((0, 0), (0.08023375, -0.003223924), (0.1604675, 0))
        make_face()
    extrude(amount=9)
    with BuildSketch(Plane(origin=(39, 22, -50.5), x_dir=(-0.08023374976133658, 0, -0.996776075856175), z_dir=(0, -1, 0))) as fillet7_piece_2:
        with BuildLine():
            CenterArc((0.240701249, 0.996776076), FILLET7_R, 243.638245269, 21.75975293)
            Line((-0.203335938, 0.100767719), (0, 0))
            ThreePointArc((0, 0), (0.08023375, 0.003223924), (0.1604675, 0))
        make_face()
    extrude(amount=9)
    # the kernel refuses this fillet: 1 mm, written as the material it takes off along each edge
    with BuildSketch(Plane(origin=(42, 26.415475947, -45.5), x_dir=(-1, 0, 0), z_dir=(0, -1, 0))) as fillet7_2_piece_1:
        with BuildLine():
            CenterArc((FILLET7_R * 1.76619037897, FILLET7_R), FILLET7_R, 149.036243468, 120.963756532)
            Line((FILLET7_R * 0.908697453257, FILLET7_R * 1.51449575543), (0, 0))
            Line((0, 0), (FILLET7_R * 1.76619037897, 0))
        make_face()
    extrude(amount=17.830951895, mode=Mode.SUBTRACT)
    with BuildSketch(Plane(origin=(-42, 26.415475947, -45.5), x_dir=(1, 0, 0), z_dir=(0, -1, 0))) as fillet7_2_piece_2:
        with BuildLine():
            CenterArc((FILLET7_R * 1.76619037897, -FILLET7_R), FILLET7_R, 90, 120.963756532)
            Line((FILLET7_R * 0.908697453257, -FILLET7_R * 1.51449575543), (0, 0))
            Line((0, 0), (FILLET7_R * 1.76619037897, 0))
        make_face()
    extrude(amount=17.830951895, mode=Mode.SUBTRACT)

    # Sketch23 → Cut-Extrude9 (cut)
    with BuildSketch(Plane(origin=(39, 0, 0), x_dir=(0, 0, -1), z_dir=(1, 0, 0))):
        with Locations((-42.75, 17.25)):
            Circle(SKETCH23_R)
    extrude(amount=-CUT_EXTRUDE9_DEPTH, mode=Mode.SUBTRACT)


solid = part.part
